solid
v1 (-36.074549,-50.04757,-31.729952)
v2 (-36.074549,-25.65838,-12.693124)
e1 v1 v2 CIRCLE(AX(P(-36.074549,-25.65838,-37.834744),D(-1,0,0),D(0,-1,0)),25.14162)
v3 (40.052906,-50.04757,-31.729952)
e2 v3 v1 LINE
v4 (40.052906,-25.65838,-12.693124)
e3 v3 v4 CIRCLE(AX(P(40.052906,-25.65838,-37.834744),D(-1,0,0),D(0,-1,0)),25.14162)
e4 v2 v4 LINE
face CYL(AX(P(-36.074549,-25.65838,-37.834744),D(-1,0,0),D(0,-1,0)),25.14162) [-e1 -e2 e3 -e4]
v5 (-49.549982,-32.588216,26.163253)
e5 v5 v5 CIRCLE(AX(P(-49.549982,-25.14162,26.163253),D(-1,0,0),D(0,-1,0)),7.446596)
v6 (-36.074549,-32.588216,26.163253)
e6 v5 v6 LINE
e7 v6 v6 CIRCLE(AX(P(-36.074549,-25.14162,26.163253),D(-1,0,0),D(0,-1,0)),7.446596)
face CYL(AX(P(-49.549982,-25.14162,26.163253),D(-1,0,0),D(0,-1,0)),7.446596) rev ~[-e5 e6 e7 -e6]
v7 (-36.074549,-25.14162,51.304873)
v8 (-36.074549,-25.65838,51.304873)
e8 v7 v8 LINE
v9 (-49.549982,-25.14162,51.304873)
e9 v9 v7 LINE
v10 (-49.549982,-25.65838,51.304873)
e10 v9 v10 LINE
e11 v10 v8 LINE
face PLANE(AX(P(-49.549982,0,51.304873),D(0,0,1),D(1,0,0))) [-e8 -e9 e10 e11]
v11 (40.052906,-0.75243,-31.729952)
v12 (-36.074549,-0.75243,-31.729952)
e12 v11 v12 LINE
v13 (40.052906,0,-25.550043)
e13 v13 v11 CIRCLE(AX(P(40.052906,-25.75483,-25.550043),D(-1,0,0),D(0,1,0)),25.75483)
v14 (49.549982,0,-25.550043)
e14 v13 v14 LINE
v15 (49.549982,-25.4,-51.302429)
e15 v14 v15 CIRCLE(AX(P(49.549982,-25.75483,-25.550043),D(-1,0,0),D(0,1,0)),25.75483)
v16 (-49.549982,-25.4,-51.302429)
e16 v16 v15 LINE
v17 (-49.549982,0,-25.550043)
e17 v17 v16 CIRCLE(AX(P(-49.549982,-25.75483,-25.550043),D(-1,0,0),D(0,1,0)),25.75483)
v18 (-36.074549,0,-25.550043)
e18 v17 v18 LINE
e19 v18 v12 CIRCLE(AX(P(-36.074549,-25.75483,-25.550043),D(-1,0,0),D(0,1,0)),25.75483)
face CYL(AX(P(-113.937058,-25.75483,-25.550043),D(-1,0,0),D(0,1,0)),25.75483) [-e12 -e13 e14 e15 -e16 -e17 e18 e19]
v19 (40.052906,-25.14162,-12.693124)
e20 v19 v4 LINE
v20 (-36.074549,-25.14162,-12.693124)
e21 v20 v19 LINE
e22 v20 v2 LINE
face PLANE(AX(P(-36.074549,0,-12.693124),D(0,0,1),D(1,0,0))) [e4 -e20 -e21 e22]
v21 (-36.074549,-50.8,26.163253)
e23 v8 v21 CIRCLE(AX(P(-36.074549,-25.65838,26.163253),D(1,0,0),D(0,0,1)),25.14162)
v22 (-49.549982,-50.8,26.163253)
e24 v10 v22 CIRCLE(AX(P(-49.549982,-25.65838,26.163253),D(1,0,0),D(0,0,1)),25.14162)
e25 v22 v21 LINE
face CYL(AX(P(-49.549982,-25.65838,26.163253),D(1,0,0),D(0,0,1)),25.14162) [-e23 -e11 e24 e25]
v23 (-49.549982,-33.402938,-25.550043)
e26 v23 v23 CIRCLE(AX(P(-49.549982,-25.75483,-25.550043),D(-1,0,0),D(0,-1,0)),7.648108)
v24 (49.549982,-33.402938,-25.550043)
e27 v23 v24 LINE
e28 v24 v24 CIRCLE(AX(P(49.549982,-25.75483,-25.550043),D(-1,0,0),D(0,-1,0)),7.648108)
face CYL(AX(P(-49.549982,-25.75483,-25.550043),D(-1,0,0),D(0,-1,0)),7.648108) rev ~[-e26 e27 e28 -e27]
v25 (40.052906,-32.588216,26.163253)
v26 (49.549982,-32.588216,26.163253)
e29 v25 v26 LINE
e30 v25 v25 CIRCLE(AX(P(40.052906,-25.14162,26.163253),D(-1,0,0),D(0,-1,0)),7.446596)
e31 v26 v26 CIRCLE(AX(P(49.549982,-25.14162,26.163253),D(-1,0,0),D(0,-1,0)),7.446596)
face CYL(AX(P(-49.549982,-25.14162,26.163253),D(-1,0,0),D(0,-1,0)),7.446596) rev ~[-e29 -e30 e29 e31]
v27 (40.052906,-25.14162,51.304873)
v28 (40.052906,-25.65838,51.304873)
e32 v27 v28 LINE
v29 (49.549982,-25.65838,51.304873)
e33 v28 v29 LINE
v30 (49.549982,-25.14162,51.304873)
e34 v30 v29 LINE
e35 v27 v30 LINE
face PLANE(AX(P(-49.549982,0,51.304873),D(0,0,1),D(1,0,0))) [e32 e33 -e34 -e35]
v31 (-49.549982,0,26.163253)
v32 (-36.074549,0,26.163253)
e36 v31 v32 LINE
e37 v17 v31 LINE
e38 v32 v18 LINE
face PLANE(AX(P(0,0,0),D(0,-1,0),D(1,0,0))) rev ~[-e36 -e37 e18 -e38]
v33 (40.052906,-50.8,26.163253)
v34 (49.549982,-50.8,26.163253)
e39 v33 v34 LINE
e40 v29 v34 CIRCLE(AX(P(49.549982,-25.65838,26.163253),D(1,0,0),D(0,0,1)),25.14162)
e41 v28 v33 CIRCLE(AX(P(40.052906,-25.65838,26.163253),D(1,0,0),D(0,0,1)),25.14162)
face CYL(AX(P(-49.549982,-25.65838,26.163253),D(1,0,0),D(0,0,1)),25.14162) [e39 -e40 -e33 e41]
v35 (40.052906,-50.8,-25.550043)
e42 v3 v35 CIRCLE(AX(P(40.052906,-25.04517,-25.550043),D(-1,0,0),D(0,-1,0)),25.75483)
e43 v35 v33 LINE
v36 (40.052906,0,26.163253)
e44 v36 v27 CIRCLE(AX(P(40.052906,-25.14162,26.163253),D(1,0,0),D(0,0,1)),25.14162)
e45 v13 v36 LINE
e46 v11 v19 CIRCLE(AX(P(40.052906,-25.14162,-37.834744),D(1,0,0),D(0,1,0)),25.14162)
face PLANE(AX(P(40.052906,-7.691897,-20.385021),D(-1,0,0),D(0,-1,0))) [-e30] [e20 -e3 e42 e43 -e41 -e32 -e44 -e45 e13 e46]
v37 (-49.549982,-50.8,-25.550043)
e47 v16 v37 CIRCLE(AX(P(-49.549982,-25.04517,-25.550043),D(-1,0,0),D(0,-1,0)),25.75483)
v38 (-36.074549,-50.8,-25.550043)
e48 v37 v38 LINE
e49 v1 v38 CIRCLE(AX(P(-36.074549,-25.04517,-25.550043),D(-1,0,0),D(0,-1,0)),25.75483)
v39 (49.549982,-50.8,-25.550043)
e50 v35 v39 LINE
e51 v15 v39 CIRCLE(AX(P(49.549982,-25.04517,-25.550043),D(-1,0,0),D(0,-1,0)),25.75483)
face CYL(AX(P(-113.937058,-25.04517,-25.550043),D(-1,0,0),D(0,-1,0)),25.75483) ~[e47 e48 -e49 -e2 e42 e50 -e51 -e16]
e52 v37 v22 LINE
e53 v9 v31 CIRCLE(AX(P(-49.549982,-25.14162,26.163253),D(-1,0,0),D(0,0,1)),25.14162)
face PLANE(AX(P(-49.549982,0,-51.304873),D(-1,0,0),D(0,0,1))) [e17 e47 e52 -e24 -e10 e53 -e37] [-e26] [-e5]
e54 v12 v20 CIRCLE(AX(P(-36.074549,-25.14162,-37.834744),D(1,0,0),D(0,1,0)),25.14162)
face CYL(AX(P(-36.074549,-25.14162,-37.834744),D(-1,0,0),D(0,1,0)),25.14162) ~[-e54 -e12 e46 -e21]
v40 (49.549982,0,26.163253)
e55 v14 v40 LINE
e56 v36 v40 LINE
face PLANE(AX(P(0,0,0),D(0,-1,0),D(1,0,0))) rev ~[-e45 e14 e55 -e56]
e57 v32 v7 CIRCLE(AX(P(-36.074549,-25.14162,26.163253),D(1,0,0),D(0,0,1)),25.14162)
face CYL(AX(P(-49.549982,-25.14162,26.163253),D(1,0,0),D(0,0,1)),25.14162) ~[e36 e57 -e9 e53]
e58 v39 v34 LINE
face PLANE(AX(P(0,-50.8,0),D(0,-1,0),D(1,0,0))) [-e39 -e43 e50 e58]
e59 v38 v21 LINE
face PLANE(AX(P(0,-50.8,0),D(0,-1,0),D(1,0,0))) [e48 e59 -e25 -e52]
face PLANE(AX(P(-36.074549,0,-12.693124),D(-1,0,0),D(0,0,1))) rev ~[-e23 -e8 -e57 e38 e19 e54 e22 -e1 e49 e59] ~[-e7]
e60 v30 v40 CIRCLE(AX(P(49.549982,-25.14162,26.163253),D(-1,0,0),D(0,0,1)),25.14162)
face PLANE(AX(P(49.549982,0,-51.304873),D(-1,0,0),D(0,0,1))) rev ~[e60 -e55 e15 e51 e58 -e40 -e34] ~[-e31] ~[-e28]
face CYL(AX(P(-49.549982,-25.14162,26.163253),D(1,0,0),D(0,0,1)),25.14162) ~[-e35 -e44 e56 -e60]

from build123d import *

# Parameters (mm, degrees)
F0_W        = 99.0999639034
F0_H        = 102.6097461581
F1_DEPTH    = 50.8
F2_R        = 25.1416200386
F3_T1_DEPTH = 227.8741153204
F4_R        = 7.4465956944
F4_R_2      = 7.6481080303
F5_DEPTH    = 155.448
F6_W        = 76.1274546385
F6_H        = 70.1917465776
F7_DEPTH    = 112.268
F8_T1_DEPTH = 76.1274546385


# Not quite as in the source:
# - a fillet or chamfer that OpenCascade refuses, or shapes differently, is made with other operations: its cross-section is extruded or revolved along the edge and cut away or added


with BuildPart() as f1:
    # F0 (on Front) → F1 (new body)
    with BuildSketch(Plane.XZ):
        Rectangle(F0_W, F0_H)
    extrude(amount=F1_DEPTH)

    # F2
    f2_edges = [f1.edges().sort_by_distance(p)[0] for p in [
        (0, -50.8, 51.304873),
        (0, 0, 51.304873),
    ]]
    fillet(f2_edges, radius=F2_R)

    # F3: fillet of radius 25.7548302834 on 2 edges, made by hand

    # F3_s2 → F3_t1 (cut)
    with BuildSketch(Plane.YZ.offset(-113.9370576602)):
        with BuildLine():
            ThreePointArc((0, -25.5500427957), (-7.5434151417, -43.7614579374), (-25.7548302834, -51.3048730791))
            Line((-25.7548302834, -51.3048730791), (0, -51.3048730791))
            Line((0, -51.3048730791), (0, -25.5500427957))
        make_face()
        with BuildLine():
            ThreePointArc((-50.8, -25.5500427957), (-43.2565848583, -43.7614579374), (-25.0451697166, -51.3048730791))
            Line((-25.0451697166, -51.3048730791), (-50.8, -51.3048730791))
            Line((-50.8, -51.3048730791), (-50.8, -25.5500427957))
        make_face()
    extrude(amount=F3_T1_DEPTH, mode=Mode.SUBTRACT)

    # F4 (on face) → F5 (cut)
    with BuildSketch(Plane(origin=(-49.5499819517, 0, 0), x_dir=(0, -1, 0), z_dir=(-1, 0, 0))):
        with Locations((25.1416200386, 26.1632530405)):
            Circle(F4_R)
        with Locations((25.7548302834, -25.5500427957)):
            Circle(F4_R_2)
    extrude(amount=-F5_DEPTH, mode=Mode.SUBTRACT)

    # F6 (on Front) → F7 (cut)
    with BuildSketch(Plane.XZ):
        with Locations((1.9891783595, 22.4027493969)):
            Rectangle(F6_W, F6_H)
    extrude(amount=F7_DEPTH, mode=Mode.SUBTRACT)

    # F8: fillet of radius 25.1416200386 on 2 edges, made by hand

    # F8_s2 → F8_t1 (cut)
    with BuildSketch(Plane.YZ.offset(-36.0745489597)):
        with BuildLine():
            ThreePointArc((-50.8, -37.8347439305), (-43.4361899807, -20.0569339112), (-25.6583799614, -12.6931238919))
            Line((-25.6583799614, -12.6931238919), (-50.8, -12.6931238919))
            Line((-50.8, -12.6931238919), (-50.8, -37.8347439305))
        make_face()
        with BuildLine():
            ThreePointArc((0, -37.8347439305), (-7.3638100193, -20.0569339112), (-25.1416200386, -12.6931238919))
            Line((-25.1416200386, -12.6931238919), (0, -12.6931238919))
            Line((0, -12.6931238919), (0, -37.8347439305))
        make_face()
    extrude(amount=F8_T1_DEPTH, mode=Mode.SUBTRACT)


solid = f1.part
